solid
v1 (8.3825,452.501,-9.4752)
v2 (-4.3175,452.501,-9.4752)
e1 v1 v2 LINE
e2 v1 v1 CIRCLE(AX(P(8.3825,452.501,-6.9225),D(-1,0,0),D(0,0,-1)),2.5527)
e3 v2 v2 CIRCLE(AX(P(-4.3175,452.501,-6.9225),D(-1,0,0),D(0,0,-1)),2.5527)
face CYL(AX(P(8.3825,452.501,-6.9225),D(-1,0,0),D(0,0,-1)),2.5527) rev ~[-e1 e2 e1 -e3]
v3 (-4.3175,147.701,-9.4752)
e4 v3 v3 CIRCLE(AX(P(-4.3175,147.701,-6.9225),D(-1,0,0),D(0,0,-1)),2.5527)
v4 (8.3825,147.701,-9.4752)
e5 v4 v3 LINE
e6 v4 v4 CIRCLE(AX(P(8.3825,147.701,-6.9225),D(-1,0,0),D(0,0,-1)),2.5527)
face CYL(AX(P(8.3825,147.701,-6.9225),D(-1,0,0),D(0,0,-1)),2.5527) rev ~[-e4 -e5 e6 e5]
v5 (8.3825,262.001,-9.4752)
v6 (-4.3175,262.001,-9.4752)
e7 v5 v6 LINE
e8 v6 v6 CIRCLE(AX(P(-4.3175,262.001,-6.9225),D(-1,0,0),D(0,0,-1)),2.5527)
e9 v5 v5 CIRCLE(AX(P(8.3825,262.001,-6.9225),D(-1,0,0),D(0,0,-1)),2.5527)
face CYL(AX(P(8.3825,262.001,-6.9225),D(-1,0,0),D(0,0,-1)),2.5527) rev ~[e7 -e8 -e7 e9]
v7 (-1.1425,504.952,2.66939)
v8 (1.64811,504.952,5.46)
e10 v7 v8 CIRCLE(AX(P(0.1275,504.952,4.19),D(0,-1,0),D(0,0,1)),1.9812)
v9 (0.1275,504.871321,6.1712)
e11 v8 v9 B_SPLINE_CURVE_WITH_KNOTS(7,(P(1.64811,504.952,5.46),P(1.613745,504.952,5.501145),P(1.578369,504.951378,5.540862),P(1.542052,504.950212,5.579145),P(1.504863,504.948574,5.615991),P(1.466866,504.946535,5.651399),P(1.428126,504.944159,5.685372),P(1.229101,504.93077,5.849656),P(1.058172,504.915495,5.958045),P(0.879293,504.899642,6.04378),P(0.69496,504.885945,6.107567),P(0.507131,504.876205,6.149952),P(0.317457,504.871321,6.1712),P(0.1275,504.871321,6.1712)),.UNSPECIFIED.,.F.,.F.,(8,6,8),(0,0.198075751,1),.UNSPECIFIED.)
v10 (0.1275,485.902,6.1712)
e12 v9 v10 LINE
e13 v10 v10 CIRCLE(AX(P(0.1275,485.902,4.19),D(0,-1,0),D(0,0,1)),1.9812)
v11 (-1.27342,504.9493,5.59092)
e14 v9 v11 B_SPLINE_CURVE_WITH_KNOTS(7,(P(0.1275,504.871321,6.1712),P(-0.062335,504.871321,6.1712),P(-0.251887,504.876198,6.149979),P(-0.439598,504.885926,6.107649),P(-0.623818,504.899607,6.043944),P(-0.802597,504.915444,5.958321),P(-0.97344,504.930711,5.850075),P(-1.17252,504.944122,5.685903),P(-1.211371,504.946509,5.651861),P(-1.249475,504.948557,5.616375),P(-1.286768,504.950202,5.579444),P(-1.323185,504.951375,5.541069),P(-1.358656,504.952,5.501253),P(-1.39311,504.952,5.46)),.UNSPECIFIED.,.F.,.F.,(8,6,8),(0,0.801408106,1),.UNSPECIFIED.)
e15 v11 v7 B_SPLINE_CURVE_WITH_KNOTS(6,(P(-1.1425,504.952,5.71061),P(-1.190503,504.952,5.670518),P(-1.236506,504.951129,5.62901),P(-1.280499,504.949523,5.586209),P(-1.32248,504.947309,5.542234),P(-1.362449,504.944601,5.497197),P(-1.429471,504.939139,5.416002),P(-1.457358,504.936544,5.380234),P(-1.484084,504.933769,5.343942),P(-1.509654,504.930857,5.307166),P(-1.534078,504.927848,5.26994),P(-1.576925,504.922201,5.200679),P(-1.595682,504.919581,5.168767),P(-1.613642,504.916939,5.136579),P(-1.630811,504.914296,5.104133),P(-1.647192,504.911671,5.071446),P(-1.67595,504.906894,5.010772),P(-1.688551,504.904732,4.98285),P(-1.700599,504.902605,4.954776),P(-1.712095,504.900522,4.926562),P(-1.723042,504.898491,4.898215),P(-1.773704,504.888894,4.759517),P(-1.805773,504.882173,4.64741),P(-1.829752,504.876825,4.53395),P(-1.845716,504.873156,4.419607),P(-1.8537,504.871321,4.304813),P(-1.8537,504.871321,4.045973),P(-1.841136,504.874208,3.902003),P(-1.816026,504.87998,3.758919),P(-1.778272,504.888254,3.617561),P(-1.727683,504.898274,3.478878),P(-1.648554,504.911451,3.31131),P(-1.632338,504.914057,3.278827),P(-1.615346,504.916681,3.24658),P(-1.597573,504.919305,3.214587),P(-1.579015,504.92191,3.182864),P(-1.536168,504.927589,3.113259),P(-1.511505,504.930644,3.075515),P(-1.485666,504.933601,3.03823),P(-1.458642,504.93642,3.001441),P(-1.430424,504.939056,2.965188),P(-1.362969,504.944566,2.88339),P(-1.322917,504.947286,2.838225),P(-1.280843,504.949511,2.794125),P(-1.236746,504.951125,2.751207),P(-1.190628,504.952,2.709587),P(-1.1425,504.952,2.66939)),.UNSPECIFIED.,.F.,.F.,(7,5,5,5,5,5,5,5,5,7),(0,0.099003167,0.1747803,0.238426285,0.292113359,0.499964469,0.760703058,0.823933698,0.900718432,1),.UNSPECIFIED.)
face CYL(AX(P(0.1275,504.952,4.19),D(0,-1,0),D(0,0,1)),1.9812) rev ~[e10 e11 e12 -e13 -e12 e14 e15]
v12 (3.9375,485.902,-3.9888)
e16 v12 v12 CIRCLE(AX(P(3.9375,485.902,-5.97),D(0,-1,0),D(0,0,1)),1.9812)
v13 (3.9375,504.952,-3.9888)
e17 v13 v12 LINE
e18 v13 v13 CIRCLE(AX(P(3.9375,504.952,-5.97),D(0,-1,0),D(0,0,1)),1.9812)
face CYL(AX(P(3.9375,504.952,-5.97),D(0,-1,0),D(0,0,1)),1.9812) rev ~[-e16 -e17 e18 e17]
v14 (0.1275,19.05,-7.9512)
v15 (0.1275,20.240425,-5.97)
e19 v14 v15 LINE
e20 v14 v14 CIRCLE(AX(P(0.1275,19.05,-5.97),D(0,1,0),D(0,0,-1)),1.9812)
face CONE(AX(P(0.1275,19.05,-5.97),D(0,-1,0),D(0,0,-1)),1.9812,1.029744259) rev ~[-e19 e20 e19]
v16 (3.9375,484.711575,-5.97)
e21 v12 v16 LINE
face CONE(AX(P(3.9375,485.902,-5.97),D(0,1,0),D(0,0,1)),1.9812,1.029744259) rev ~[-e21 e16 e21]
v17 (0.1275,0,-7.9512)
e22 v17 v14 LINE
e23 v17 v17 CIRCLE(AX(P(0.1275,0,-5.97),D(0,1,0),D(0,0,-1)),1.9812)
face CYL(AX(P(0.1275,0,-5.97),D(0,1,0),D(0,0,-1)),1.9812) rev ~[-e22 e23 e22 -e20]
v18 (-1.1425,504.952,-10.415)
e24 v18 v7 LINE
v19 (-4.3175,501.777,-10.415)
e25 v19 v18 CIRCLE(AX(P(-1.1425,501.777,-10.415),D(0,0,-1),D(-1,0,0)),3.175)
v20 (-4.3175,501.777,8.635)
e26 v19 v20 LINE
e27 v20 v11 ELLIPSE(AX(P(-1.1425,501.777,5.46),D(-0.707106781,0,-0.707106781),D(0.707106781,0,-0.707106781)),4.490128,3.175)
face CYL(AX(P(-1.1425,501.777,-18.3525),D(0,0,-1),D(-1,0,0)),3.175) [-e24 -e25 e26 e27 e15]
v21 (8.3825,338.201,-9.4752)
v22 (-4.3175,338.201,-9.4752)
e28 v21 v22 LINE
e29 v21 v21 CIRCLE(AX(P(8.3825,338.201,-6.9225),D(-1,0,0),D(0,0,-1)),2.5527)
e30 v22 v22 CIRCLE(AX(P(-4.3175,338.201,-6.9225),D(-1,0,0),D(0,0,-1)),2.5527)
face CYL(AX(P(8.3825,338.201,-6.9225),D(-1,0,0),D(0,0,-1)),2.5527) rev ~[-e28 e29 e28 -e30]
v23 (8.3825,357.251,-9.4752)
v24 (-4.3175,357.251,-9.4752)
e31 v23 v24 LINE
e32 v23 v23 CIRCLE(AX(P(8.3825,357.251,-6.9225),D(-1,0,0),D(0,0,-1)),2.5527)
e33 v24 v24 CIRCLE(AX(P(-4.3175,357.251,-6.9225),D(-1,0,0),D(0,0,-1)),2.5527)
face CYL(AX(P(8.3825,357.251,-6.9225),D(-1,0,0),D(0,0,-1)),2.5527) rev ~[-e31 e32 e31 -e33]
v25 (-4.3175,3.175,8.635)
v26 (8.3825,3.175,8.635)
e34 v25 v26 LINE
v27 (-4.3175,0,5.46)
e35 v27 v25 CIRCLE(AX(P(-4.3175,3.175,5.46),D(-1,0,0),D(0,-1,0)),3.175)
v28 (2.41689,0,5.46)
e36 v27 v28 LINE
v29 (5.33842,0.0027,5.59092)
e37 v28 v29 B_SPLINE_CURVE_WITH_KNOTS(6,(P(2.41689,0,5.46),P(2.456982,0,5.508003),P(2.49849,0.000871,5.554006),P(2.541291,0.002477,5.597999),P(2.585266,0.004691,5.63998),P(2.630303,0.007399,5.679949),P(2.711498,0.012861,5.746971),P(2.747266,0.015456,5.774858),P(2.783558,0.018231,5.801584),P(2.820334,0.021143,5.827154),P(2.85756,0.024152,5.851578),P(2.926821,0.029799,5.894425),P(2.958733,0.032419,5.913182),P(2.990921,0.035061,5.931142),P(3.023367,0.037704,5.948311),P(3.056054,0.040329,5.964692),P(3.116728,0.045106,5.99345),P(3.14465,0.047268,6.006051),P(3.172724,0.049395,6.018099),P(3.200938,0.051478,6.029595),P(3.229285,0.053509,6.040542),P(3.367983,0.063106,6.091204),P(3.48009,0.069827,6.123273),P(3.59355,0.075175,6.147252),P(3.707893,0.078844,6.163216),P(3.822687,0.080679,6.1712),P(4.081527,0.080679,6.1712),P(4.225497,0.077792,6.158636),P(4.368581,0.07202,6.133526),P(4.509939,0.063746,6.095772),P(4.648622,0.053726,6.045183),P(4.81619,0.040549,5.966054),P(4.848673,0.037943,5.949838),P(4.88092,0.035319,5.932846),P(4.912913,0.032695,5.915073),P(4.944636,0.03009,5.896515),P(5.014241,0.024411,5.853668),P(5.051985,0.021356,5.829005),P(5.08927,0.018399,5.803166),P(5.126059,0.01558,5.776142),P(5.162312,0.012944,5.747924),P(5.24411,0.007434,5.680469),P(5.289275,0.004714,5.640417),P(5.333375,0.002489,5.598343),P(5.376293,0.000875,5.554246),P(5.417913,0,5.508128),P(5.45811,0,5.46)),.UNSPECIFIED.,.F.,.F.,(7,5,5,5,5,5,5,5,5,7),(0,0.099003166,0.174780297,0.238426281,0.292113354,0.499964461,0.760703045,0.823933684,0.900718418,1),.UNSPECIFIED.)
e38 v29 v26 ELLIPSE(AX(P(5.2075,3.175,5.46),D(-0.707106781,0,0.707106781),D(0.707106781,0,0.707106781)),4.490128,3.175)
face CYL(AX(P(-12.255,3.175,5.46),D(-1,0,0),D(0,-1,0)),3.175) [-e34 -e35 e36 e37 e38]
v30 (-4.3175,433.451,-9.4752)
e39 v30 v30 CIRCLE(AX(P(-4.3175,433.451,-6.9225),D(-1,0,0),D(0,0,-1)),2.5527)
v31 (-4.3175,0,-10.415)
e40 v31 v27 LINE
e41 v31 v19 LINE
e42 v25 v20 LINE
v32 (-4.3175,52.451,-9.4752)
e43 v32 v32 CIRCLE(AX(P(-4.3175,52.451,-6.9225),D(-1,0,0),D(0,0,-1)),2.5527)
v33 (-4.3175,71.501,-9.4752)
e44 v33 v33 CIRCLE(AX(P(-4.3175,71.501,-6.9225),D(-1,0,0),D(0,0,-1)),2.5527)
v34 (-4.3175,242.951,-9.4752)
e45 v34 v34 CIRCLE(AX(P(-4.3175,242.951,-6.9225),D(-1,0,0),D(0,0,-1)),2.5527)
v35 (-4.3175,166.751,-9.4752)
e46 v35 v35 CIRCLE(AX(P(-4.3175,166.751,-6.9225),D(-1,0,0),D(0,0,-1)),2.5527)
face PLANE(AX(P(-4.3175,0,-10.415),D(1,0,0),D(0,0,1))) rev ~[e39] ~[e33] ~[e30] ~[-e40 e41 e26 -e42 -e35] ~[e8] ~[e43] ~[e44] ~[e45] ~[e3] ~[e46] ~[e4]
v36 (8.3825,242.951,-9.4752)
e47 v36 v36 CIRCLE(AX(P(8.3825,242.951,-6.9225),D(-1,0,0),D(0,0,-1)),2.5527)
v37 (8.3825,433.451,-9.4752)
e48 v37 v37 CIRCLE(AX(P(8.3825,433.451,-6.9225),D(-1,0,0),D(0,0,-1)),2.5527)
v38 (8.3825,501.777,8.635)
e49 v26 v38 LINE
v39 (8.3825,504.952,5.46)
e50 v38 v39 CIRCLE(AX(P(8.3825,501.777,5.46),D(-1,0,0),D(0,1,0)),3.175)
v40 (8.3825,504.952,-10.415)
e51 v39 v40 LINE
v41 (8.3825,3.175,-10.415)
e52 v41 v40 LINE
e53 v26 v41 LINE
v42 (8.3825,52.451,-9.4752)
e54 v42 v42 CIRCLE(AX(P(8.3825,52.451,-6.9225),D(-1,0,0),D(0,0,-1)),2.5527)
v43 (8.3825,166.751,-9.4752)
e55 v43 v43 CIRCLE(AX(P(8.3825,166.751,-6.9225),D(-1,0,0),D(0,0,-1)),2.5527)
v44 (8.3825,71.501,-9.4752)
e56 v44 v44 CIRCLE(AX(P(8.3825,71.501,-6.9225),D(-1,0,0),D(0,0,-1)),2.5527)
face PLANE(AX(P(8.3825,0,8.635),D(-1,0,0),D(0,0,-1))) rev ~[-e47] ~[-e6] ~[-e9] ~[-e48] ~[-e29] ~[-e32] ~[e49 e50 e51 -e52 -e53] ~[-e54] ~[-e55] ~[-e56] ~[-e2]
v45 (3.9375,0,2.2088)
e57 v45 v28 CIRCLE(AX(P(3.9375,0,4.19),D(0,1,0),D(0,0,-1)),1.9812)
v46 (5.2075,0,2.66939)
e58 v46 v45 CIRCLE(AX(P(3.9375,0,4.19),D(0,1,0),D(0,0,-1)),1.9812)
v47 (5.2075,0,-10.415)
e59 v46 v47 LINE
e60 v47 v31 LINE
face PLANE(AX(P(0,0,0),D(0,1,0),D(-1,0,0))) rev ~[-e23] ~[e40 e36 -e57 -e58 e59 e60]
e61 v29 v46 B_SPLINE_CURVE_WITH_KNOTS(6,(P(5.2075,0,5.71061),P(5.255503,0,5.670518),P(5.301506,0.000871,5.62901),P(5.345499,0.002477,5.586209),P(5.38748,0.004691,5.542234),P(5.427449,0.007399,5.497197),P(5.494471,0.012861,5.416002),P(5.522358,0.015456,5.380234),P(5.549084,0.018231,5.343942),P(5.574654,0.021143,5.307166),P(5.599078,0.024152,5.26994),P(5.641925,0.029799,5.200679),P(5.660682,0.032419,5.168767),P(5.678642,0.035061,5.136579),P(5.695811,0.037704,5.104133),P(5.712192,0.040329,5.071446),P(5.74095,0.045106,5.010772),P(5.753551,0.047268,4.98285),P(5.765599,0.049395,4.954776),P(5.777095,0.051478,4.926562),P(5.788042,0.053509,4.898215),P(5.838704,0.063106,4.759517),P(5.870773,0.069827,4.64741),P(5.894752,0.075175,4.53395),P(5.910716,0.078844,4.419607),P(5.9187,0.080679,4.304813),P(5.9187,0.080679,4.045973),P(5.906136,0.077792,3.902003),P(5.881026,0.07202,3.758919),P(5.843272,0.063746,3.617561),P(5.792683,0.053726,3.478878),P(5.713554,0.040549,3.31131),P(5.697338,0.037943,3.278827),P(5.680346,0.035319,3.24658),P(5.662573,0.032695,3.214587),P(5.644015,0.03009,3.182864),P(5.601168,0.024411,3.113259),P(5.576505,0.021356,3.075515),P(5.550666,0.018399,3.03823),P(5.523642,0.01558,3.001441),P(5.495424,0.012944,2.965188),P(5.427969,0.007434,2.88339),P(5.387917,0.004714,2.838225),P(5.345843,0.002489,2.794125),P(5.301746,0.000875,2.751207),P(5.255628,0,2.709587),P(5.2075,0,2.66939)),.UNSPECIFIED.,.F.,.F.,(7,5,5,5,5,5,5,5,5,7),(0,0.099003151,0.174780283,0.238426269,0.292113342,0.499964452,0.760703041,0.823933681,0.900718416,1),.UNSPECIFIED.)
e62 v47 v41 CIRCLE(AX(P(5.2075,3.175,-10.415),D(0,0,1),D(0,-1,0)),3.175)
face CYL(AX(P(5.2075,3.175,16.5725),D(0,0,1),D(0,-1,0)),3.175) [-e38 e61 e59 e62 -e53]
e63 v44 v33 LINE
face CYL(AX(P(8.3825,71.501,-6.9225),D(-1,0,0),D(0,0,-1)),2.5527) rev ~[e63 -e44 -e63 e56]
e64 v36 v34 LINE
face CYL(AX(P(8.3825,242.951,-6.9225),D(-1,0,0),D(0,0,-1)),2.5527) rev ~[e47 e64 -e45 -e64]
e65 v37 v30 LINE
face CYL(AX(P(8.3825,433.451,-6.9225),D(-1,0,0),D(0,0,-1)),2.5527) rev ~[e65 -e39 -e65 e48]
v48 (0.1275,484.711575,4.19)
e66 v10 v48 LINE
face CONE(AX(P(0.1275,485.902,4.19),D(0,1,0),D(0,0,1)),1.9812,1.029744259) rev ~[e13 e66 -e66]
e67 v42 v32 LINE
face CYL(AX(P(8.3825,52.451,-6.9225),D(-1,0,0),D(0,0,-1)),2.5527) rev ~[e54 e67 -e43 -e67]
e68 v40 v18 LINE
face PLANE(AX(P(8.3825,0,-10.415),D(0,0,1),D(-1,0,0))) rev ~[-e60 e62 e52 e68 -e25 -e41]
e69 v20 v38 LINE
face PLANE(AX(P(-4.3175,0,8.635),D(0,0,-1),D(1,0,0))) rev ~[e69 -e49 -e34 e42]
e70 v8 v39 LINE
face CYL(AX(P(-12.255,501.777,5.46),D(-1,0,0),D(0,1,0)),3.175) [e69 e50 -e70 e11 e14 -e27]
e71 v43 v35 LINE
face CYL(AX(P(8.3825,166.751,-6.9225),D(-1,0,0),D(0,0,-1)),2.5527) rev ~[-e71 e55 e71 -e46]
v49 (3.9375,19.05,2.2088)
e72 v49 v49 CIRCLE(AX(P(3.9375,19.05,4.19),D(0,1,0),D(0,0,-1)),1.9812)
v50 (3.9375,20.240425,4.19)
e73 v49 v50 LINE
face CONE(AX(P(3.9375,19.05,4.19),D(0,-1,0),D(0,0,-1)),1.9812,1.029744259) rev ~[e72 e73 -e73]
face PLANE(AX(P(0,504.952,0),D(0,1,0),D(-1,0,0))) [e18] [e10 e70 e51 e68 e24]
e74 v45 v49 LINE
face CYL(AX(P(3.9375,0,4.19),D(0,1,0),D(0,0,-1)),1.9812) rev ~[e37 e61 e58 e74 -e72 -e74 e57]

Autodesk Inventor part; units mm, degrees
ref_plane "YZ Plane" through (0, 0, 0) normal (1, 0, 0) x (0, 1, 0)
ref_plane "XZ Plane" through (0, 0, 0) normal (0, 1, 0) x (-1, 0, 0)
ref_plane "XY Plane" through (0, 0, 0) normal (0, 0, 1) x (1, 0, 0)
sketch "Sketch1" plane through (0, 0, 0) normal (0, 1, 0) x (-1, 0, 0)
  line L0 (4.3175, 8.635) -> (-8.3825, 8.635)
  line L1 (-8.3825, 8.635) -> (-8.3825, -10.415)
  line L2 (-8.3825, -10.415) -> (4.3175, -10.415)
  line L3 (4.3175, -10.415) -> (4.3175, 8.635)
  point P0 (0, 0)
  dimension "d0" = 19.05
  dimension "d1" = 12.7
extrude "Extrusion1" add sketch "Sketch1" along normal blind 504.952
sketch "Sketch2" plane through (8.3825, 0, 8.635) normal (1, 0, 0) x (0, 0, -1)
  line L0 (19.05, 0) -> (19.05, 504.952) projected
  line L1 (15.5575, 452.501) -> (15.5575, 433.451) construction
  line L2 (15.5575, 442.976) -> (19.05, 442.976) construction
  line L3 (15.5575, 357.251) -> (15.5575, 338.201) construction
  line L4 (15.5575, 347.726) -> (19.05, 347.726) construction
  line L5 (15.5575, 262.001) -> (15.5575, 242.951) construction
  line L6 (15.5575, 252.476) -> (19.05, 252.476) construction
  line L7 (15.5575, 166.751) -> (15.5575, 147.701) construction
  line L8 (15.5575, 157.226) -> (19.05, 157.226) construction
  line L9 (15.5575, 71.501) -> (15.5575, 52.451) construction
  line L10 (15.5575, 61.976) -> (19.05, 61.976) construction
  point P0 (8.635, 0)
  dimension "d4" = 19.05
  dimension "d5" = 3.4925
  dimension "d8" = 95.25
hole "Hole1" at (8.3825, 452.501, -6.9225) at (8.3825, 433.451, -6.9225) at (8.3825, 357.251, -6.9225) at (8.3825, 338.201, -6.9225) at (8.3825, 262.001, -6.9225) at (8.3825, 242.951, -6.9225) at (8.3825, 166.751, -6.9225) at (8.3825, 147.701, -6.9225) at (8.3825, 71.501, -6.9225) at (8.3825, 52.451, -6.9225) direction (-1, 0, 0) diameter 5.1054 end up to surface clearance for "Socket Head Cap Screw" size "#10" standard "Ansi Unified Screw Threads"
sketch "Sketch3" plane through (0, 504.952, 0) normal (0, 1, 0) x (1, 0, 0)
  circle A0 centre (3.9375, 5.97) radius 2.413 construction
  circle A1 centre (0.1275, -4.19) radius 2.413 construction
  line L0 (-4.3175, -8.635) -> (8.3825, -8.635) construction
  line L1 (-4.3175, 10.415) -> (-4.3175, -8.635) construction
  line L2 (8.3825, -8.635) -> (8.3825, 10.415) construction
  line L3 (8.3825, 10.415) -> (-4.3175, 10.415) construction
  point P0 (0, 0)
  dimension "d20" = 4.826
  dimension "d21" = 4.445
  dimension "d22" = 4.445
  dimension "d23" = 4.445
  dimension "d24" = 4.445
hole "Hole2" at (0.1275, 504.952, 4.19) at (3.9375, 504.952, -5.97) direction (0, -1, 0) diameter 3.9624 depth 19.05 tip angle 118 thread size "10-32 UNF" class "2B" standard "ANSI Unified Screw Threads"
sketch "Sketch4" plane through (0, 0, 0) normal (0, -1, 0) x (1, 0, 0)
  line L0 (8.3825, -10.415) -> (-4.3175, -10.415) projected
  line L1 (-4.3175, -10.415) -> (-4.3175, 8.635) projected
  line L2 (8.3825, 8.635) -> (8.3825, -10.415) projected
  line L3 (-4.3175, 8.635) -> (8.3825, 8.635) projected
  point P0 (0, 0)
  point P1 (0.1275, -5.97)
  point P2 (3.9375, 4.19)
  dimension "d32" = 4.445
  dimension "d33" = 4.445
  dimension "d34" = 4.445
  dimension "d35" = 4.445
hole "Hole3" at (0.1275, 0, -5.97) at (3.9375, 0, 4.19) direction (0, 1, 0) diameter 3.9624 depth 19.05 tip angle 118 thread size "10-32 UNF" class "2B" standard "ANSI Unified Screw Threads"
fillet "Fillet1" radius 3.175 4 edges at (-4.3175, 504.952, -0.89) (8.3825, 0, -0.89) (2.0325, 0, 8.635) (2.0325, 504.952, 8.635)
equation "\"d22\" = d21"
equation "\"d23\" = d21"
equation "\"d24\" = d21"
equation "\"d32\" = d21"
equation "\"d33\" = d21"
equation "\"d34\" = d21"
equation "\"d35\" = d21"
properties part number "Winch_Plate_Rear" material "Aluminum 6061"
